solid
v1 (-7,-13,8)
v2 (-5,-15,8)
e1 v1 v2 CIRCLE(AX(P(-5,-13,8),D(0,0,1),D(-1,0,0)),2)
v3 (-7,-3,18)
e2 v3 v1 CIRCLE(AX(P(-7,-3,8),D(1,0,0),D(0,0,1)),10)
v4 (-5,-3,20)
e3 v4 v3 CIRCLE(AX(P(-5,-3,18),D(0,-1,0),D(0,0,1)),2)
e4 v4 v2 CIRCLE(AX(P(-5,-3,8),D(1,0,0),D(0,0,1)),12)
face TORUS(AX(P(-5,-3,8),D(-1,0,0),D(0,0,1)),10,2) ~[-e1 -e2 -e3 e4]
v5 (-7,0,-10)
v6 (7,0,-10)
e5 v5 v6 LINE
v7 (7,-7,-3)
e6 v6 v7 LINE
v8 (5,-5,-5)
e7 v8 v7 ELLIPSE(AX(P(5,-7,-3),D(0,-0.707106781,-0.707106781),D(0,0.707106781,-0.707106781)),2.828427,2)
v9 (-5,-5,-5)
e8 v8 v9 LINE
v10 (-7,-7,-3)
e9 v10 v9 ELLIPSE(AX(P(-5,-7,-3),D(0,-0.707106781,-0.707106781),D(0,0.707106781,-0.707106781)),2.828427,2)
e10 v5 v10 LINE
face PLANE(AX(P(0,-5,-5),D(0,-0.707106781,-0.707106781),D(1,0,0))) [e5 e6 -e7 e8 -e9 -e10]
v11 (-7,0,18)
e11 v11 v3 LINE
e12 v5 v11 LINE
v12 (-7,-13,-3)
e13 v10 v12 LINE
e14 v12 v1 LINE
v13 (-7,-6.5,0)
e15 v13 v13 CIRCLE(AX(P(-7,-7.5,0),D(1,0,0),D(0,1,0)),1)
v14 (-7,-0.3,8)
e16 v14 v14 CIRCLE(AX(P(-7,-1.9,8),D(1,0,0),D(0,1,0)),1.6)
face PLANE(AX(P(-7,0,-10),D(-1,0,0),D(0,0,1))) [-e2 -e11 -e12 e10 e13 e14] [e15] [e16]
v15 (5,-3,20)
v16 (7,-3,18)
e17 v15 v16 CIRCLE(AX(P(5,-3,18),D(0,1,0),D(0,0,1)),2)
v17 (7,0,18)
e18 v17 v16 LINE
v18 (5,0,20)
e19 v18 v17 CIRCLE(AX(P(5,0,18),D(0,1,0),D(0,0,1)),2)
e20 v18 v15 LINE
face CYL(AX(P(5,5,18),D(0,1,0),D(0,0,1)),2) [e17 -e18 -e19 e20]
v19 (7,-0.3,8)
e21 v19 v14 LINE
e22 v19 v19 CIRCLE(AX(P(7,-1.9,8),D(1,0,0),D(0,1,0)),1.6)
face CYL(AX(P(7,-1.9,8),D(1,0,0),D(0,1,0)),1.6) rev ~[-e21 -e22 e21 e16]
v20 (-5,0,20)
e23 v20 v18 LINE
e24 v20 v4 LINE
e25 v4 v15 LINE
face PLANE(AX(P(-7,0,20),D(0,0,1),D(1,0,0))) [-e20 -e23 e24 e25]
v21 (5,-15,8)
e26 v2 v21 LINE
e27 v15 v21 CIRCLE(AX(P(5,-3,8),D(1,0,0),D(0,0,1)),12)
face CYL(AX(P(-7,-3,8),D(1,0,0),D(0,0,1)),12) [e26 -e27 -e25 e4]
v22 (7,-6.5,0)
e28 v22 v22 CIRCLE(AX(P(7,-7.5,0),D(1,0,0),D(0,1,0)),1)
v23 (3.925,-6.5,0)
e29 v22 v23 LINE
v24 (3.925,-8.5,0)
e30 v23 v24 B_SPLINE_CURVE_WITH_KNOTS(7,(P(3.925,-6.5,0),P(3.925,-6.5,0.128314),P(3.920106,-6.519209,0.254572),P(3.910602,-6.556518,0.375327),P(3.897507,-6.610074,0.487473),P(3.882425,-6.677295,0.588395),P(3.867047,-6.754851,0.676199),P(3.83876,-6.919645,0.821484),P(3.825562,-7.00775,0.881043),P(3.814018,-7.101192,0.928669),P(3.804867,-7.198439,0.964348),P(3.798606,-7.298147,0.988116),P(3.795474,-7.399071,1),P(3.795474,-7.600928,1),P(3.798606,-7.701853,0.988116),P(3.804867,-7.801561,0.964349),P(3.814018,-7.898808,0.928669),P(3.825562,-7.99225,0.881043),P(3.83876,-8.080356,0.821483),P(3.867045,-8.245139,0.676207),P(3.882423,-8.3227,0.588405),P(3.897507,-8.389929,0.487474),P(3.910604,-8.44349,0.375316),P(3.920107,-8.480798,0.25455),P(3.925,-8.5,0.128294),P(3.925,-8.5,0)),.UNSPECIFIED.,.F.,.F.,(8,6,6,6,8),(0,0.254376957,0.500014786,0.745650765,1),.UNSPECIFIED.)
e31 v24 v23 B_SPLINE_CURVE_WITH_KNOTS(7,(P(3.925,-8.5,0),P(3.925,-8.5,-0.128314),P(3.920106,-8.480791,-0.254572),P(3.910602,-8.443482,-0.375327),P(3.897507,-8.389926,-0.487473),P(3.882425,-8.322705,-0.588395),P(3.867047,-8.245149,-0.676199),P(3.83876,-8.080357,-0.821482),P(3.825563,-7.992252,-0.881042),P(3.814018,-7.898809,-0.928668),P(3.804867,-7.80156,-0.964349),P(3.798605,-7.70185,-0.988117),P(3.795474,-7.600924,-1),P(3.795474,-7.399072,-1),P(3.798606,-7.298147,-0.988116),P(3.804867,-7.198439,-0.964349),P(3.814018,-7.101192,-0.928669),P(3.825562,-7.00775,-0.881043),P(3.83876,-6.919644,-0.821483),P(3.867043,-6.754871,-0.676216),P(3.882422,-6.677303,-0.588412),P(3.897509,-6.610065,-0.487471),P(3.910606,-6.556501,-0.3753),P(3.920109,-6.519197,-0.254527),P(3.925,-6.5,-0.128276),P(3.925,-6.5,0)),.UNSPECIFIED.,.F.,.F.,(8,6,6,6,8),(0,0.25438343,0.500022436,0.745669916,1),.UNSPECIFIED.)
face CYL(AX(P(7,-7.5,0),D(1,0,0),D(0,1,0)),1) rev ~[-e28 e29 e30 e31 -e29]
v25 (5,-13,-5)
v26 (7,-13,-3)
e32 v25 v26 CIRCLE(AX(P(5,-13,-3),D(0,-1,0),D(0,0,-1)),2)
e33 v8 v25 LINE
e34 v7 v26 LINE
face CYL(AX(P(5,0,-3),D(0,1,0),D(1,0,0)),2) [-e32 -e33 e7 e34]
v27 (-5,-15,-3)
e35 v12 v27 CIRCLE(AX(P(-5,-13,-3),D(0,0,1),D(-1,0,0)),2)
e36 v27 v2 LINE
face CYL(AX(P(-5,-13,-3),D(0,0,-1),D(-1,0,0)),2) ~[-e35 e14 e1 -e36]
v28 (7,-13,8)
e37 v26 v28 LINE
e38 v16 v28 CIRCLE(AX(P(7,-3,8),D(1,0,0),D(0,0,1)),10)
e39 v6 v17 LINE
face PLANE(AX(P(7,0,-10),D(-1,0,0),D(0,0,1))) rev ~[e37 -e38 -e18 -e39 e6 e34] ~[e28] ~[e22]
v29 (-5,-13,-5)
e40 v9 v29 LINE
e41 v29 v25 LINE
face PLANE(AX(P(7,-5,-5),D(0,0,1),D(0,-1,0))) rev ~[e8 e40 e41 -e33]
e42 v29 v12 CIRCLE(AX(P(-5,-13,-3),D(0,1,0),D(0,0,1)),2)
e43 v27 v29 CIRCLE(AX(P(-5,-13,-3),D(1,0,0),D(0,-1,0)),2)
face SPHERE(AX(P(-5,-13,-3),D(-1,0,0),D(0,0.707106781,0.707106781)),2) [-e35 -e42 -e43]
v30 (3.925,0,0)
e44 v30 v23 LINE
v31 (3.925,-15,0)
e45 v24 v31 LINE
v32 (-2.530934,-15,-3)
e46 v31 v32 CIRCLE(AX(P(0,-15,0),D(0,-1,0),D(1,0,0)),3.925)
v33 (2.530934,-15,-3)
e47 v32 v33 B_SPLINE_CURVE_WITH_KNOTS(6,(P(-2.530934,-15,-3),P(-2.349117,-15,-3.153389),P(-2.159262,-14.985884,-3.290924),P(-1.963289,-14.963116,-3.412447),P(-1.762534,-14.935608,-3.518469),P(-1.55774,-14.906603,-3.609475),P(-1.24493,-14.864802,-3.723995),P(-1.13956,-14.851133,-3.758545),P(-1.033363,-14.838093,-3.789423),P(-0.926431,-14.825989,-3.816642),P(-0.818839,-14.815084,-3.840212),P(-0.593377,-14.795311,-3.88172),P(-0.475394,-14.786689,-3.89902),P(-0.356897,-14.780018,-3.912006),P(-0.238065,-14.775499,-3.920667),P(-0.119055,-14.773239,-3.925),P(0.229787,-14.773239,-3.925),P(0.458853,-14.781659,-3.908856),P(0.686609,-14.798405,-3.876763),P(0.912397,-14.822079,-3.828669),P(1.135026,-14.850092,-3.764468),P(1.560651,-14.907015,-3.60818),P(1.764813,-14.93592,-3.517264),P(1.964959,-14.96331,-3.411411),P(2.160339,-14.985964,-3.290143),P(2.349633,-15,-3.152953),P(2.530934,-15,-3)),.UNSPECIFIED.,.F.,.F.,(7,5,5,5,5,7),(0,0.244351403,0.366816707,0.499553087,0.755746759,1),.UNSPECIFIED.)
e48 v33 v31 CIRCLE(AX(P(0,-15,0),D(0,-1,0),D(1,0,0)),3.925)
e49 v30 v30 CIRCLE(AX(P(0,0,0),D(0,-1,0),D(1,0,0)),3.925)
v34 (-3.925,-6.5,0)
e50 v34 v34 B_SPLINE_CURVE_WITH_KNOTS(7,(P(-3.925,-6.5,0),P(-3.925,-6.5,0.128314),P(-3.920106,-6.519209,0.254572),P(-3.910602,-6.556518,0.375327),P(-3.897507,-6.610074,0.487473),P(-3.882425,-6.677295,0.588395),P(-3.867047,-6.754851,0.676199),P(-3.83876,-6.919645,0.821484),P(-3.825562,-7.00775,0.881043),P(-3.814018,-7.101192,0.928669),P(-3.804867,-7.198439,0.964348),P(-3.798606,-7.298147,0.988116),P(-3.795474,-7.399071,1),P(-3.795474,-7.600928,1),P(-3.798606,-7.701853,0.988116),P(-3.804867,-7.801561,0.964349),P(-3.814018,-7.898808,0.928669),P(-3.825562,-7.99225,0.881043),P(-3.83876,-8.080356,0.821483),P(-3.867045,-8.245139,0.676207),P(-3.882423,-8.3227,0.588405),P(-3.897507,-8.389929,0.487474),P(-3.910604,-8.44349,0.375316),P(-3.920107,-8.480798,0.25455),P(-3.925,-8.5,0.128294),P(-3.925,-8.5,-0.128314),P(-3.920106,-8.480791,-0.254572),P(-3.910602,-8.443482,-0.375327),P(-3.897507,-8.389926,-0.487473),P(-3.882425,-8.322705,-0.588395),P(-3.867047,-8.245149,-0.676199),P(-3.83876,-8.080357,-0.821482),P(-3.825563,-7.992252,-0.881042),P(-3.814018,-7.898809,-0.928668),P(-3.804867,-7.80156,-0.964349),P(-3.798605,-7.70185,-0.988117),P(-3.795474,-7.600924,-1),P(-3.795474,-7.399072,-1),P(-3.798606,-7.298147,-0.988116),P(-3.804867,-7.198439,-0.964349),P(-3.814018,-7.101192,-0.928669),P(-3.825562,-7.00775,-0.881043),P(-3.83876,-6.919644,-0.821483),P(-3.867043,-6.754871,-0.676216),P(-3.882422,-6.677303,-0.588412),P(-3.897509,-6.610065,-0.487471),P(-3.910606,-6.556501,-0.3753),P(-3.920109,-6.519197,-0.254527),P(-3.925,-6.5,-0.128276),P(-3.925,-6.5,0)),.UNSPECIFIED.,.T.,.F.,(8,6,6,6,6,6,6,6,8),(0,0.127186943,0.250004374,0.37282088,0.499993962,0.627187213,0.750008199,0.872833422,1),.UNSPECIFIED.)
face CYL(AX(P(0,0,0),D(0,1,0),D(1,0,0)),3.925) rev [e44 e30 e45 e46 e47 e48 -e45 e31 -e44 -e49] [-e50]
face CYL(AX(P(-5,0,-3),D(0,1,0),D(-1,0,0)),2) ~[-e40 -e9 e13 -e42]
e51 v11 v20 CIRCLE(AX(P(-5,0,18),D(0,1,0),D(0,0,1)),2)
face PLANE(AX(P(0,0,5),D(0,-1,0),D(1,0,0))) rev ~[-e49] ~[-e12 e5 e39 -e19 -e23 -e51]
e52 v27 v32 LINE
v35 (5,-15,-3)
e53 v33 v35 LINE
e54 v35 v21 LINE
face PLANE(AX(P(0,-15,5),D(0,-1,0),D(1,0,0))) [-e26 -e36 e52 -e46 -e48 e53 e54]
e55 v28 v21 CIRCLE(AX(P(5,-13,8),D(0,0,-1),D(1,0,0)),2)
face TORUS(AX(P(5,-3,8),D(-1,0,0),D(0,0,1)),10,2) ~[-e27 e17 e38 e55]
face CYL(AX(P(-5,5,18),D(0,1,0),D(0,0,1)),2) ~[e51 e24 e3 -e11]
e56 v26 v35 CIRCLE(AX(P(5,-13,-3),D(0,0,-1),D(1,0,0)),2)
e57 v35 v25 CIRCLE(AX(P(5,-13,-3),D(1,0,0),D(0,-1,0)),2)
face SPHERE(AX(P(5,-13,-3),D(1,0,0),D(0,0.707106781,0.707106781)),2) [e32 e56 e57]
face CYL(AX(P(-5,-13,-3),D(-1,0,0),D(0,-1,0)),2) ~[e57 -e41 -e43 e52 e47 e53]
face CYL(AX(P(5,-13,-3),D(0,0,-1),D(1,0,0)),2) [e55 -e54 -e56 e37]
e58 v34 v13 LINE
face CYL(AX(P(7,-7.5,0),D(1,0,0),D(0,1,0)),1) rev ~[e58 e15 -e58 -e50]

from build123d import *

# Parameters (mm, degrees)
F0_W         = 14
F0_H         = 30
F0_R         = 3.925
F1_DEPTH     = 15
F3_DEPTH     = 14.001
F4_R         = 1.6
F4_R_2       = 1
F5_DEPTH     = 14.001
F6_R         = 12
F7_T1_DEPTH  = 10
F7_T3_DEPTH  = 11
F7_T5_DEPTH  = 8
F7_S9_W      = 2
F7_S9_H      = 2
F7_T10_DEPTH = 2
F7_S15_W     = 2
F7_S15_H     = 2
F7_T16_DEPTH = 2
F7_T22_DEPTH = 13
F7_T25_ANGLE = 90
F7_T29_DEPTH = 13
F7_T32_ANGLE = 90


# Not quite as in the source:
# - a fillet or chamfer that OpenCascade refuses, or shapes differently, is made with other operations: its cross-section is extruded or revolved along the edge and cut away or added


with BuildPart() as f1:
    # F0 (on Front) → F1 (new body)
    with BuildSketch(Plane.XZ):
        with Locations((0, 5)):
            Rectangle(F0_W, F0_H)
        Circle(F0_R, mode=Mode.SUBTRACT)
    extrude(amount=F1_DEPTH)

    # F2 (on face) → F3 (cut, through all)
    with BuildSketch(Plane.YZ.offset(7)):
        Polygon((-15, -10), (0, -10), (-5, -5), (-15, -5), align=None)
    extrude(amount=-F3_DEPTH, mode=Mode.SUBTRACT)

    # F4 (on face) → F5 (cut, through all)
    with BuildSketch(Plane.YZ.offset(7)):
        with Locations((-1.9, 8)):
            Circle(F4_R)
        with Locations((-7.5, 0)):
            Circle(F4_R_2)
    extrude(amount=-F5_DEPTH, mode=Mode.SUBTRACT)

    # F6
    f6_edges = [f1.edges().sort_by_distance(p)[0] for p in [
        (0, -15, 20),
    ]]
    fillet(f6_edges, radius=F6_R)

    # F7: fillet of radius 2 on 9 edges, made by hand

    # F7_s2 → F7_t1 (cut)
    with BuildSketch(Plane.YZ.offset(-5)):
        with BuildLine():
            ThreePointArc((-15, -3), (-14.4142135624, -4.4142135624), (-13, -5))
            Line((-13, -5), (-15, -5))
            Line((-15, -5), (-15, -3))
        make_face()
    extrude(amount=F7_T1_DEPTH, mode=Mode.SUBTRACT)

    # F7_s4 → F7_t3 (cut)
    with BuildSketch(Plane.XY.offset(-3)):
        with BuildLine():
            ThreePointArc((7, -13), (6.4142135624, -14.4142135624), (5, -15))
            Line((5, -15), (7, -15))
            Line((7, -15), (7, -13))
        make_face()
        with BuildLine():
            ThreePointArc((-7, -13), (-6.4142135624, -14.4142135624), (-5, -15))
            Line((-5, -15), (-7, -15))
            Line((-7, -15), (-7, -13))
        make_face()
    extrude(amount=F7_T3_DEPTH, mode=Mode.SUBTRACT)

    # F7_s6 → F7_t5 (cut)
    with BuildSketch(Plane.XZ.offset(-5)):
        with BuildLine():
            ThreePointArc((5, 20), (6.4142135624, 19.4142135624), (7, 18))
            Line((7, 18), (7, 20))
            Line((7, 20), (5, 20))
        make_face()
        with BuildLine():
            ThreePointArc((-5, 20), (-6.4142135624, 19.4142135624), (-7, 18))
            Line((-7, 18), (-7, 20))
            Line((-7, 20), (-5, 20))
        make_face()
    extrude(amount=F7_T5_DEPTH, mode=Mode.SUBTRACT)


with BuildPart() as f7_tool8:
    # F7_s9 → F7_t10 (new body)
    with BuildSketch(Plane.YZ.offset(5)):
        with Locations((-14, -4)):
            Rectangle(F7_S9_W, F7_S9_H)
    extrude(amount=F7_T10_DEPTH)

    # F7_s11 → F7_t12 (revolve, cut)
    with BuildSketch(Plane(origin=(5, -13, -3), x_dir=(0, 0.7071067812, 0.7071067812), z_dir=(0, 0.7071067812, -0.7071067812))):
        with BuildLine():
            ThreePointArc((0, -2), (2, 0), (0, 2))
            Line((0, 2), (0, -2))
        make_face()
    revolve(axis=Axis((5, -13, -3), (1, 0, 0)), mode=Mode.SUBTRACT)


with BuildPart() as f1_1:
    add(f1.part)

    # F7_t7: cut F7_tool8
    add(f7_tool8.part, mode=Mode.SUBTRACT)


with BuildPart() as f7_tool14:
    # F7_s15 → F7_t16 (new body)
    with BuildSketch(Plane.YZ.offset(-5)):
        with Locations((-14, -4)):
            Rectangle(F7_S15_W, F7_S15_H)
    extrude(amount=-F7_T16_DEPTH)

    # F7_s17 → F7_t18 (revolve, cut)
    with BuildSketch(Plane(origin=(-5, -13, -3), x_dir=(0, 0.7071067812, 0.7071067812), z_dir=(0, -0.7071067812, 0.7071067812))):
        with BuildLine():
            ThreePointArc((0, -2), (2, 0), (0, 2))
            Line((0, 2), (0, -2))
        make_face()
    revolve(axis=Axis((-5, -13, -3), (-1, 0, 0)), mode=Mode.SUBTRACT)


with BuildPart() as f1_2:
    add(f1_1.part)

    # F7_t13: cut F7_tool14
    add(f7_tool14.part, mode=Mode.SUBTRACT)


with BuildPart() as f7_tool20:
    # F7_s21 → F7_t22 (new body)
    with BuildSketch(Plane.XZ):
        with BuildLine():
            ThreePointArc((-7, -3), (-6.4142135624, -4.4142135624), (-5, -5))
            Line((-5, -5), (-7, -5))
            Line((-7, -5), (-7, -3))
        make_face()
    extrude(amount=F7_T22_DEPTH)

    split(bisect_by=Plane(origin=(0, -5, -5), x_dir=(1, 0, 0), z_dir=(0, -0.7071067812, -0.7071067812)), keep=Keep.TOP)


with BuildPart() as f1_3:
    add(f1_2.part)

    # F7_t19: cut F7_tool20
    add(f7_tool20.part, mode=Mode.SUBTRACT)

    # F7_s24 → F7_t25 (revolve, cut)
    with BuildSketch(Plane.XZ.offset(3)):
        with BuildLine():
            ThreePointArc((-5, 20), (-6.4142135624, 19.4142135624), (-7, 18))
            Line((-7, 18), (-7, 20))
            Line((-7, 20), (-5, 20))
        make_face()
    revolve(axis=Axis((-7, -3, 8), (1, 0, 0)), revolution_arc=F7_T25_ANGLE, mode=Mode.SUBTRACT)


with BuildPart() as f7_tool27:
    # F7_s28 → F7_t29 (new body)
    with BuildSketch(Plane.XZ):
        with BuildLine():
            ThreePointArc((7, -3), (6.4142135624, -4.4142135624), (5, -5))
            Line((5, -5), (7, -5))
            Line((7, -5), (7, -3))
        make_face()
    extrude(amount=F7_T29_DEPTH)

    split(bisect_by=Plane(origin=(0, -5, -5), x_dir=(1, 0, 0), z_dir=(0, -0.7071067812, -0.7071067812)), keep=Keep.TOP)


with BuildPart() as f1_4:
    add(f1_3.part)

    # F7_t26: cut F7_tool27
    add(f7_tool27.part, mode=Mode.SUBTRACT)

    # F7_s31 → F7_t32 (revolve, cut)
    with BuildSketch(Plane.XZ.offset(3)):
        with BuildLine():
            ThreePointArc((7, 18), (6.4142135624, 19.4142135624), (5, 20))
            Line((5, 20), (7, 20))
            Line((7, 20), (7, 18))
        make_face()
    revolve(axis=Axis((7, -3, 8), (1, 0, 0)), revolution_arc=F7_T32_ANGLE, mode=Mode.SUBTRACT)


solid = f1_4.part
